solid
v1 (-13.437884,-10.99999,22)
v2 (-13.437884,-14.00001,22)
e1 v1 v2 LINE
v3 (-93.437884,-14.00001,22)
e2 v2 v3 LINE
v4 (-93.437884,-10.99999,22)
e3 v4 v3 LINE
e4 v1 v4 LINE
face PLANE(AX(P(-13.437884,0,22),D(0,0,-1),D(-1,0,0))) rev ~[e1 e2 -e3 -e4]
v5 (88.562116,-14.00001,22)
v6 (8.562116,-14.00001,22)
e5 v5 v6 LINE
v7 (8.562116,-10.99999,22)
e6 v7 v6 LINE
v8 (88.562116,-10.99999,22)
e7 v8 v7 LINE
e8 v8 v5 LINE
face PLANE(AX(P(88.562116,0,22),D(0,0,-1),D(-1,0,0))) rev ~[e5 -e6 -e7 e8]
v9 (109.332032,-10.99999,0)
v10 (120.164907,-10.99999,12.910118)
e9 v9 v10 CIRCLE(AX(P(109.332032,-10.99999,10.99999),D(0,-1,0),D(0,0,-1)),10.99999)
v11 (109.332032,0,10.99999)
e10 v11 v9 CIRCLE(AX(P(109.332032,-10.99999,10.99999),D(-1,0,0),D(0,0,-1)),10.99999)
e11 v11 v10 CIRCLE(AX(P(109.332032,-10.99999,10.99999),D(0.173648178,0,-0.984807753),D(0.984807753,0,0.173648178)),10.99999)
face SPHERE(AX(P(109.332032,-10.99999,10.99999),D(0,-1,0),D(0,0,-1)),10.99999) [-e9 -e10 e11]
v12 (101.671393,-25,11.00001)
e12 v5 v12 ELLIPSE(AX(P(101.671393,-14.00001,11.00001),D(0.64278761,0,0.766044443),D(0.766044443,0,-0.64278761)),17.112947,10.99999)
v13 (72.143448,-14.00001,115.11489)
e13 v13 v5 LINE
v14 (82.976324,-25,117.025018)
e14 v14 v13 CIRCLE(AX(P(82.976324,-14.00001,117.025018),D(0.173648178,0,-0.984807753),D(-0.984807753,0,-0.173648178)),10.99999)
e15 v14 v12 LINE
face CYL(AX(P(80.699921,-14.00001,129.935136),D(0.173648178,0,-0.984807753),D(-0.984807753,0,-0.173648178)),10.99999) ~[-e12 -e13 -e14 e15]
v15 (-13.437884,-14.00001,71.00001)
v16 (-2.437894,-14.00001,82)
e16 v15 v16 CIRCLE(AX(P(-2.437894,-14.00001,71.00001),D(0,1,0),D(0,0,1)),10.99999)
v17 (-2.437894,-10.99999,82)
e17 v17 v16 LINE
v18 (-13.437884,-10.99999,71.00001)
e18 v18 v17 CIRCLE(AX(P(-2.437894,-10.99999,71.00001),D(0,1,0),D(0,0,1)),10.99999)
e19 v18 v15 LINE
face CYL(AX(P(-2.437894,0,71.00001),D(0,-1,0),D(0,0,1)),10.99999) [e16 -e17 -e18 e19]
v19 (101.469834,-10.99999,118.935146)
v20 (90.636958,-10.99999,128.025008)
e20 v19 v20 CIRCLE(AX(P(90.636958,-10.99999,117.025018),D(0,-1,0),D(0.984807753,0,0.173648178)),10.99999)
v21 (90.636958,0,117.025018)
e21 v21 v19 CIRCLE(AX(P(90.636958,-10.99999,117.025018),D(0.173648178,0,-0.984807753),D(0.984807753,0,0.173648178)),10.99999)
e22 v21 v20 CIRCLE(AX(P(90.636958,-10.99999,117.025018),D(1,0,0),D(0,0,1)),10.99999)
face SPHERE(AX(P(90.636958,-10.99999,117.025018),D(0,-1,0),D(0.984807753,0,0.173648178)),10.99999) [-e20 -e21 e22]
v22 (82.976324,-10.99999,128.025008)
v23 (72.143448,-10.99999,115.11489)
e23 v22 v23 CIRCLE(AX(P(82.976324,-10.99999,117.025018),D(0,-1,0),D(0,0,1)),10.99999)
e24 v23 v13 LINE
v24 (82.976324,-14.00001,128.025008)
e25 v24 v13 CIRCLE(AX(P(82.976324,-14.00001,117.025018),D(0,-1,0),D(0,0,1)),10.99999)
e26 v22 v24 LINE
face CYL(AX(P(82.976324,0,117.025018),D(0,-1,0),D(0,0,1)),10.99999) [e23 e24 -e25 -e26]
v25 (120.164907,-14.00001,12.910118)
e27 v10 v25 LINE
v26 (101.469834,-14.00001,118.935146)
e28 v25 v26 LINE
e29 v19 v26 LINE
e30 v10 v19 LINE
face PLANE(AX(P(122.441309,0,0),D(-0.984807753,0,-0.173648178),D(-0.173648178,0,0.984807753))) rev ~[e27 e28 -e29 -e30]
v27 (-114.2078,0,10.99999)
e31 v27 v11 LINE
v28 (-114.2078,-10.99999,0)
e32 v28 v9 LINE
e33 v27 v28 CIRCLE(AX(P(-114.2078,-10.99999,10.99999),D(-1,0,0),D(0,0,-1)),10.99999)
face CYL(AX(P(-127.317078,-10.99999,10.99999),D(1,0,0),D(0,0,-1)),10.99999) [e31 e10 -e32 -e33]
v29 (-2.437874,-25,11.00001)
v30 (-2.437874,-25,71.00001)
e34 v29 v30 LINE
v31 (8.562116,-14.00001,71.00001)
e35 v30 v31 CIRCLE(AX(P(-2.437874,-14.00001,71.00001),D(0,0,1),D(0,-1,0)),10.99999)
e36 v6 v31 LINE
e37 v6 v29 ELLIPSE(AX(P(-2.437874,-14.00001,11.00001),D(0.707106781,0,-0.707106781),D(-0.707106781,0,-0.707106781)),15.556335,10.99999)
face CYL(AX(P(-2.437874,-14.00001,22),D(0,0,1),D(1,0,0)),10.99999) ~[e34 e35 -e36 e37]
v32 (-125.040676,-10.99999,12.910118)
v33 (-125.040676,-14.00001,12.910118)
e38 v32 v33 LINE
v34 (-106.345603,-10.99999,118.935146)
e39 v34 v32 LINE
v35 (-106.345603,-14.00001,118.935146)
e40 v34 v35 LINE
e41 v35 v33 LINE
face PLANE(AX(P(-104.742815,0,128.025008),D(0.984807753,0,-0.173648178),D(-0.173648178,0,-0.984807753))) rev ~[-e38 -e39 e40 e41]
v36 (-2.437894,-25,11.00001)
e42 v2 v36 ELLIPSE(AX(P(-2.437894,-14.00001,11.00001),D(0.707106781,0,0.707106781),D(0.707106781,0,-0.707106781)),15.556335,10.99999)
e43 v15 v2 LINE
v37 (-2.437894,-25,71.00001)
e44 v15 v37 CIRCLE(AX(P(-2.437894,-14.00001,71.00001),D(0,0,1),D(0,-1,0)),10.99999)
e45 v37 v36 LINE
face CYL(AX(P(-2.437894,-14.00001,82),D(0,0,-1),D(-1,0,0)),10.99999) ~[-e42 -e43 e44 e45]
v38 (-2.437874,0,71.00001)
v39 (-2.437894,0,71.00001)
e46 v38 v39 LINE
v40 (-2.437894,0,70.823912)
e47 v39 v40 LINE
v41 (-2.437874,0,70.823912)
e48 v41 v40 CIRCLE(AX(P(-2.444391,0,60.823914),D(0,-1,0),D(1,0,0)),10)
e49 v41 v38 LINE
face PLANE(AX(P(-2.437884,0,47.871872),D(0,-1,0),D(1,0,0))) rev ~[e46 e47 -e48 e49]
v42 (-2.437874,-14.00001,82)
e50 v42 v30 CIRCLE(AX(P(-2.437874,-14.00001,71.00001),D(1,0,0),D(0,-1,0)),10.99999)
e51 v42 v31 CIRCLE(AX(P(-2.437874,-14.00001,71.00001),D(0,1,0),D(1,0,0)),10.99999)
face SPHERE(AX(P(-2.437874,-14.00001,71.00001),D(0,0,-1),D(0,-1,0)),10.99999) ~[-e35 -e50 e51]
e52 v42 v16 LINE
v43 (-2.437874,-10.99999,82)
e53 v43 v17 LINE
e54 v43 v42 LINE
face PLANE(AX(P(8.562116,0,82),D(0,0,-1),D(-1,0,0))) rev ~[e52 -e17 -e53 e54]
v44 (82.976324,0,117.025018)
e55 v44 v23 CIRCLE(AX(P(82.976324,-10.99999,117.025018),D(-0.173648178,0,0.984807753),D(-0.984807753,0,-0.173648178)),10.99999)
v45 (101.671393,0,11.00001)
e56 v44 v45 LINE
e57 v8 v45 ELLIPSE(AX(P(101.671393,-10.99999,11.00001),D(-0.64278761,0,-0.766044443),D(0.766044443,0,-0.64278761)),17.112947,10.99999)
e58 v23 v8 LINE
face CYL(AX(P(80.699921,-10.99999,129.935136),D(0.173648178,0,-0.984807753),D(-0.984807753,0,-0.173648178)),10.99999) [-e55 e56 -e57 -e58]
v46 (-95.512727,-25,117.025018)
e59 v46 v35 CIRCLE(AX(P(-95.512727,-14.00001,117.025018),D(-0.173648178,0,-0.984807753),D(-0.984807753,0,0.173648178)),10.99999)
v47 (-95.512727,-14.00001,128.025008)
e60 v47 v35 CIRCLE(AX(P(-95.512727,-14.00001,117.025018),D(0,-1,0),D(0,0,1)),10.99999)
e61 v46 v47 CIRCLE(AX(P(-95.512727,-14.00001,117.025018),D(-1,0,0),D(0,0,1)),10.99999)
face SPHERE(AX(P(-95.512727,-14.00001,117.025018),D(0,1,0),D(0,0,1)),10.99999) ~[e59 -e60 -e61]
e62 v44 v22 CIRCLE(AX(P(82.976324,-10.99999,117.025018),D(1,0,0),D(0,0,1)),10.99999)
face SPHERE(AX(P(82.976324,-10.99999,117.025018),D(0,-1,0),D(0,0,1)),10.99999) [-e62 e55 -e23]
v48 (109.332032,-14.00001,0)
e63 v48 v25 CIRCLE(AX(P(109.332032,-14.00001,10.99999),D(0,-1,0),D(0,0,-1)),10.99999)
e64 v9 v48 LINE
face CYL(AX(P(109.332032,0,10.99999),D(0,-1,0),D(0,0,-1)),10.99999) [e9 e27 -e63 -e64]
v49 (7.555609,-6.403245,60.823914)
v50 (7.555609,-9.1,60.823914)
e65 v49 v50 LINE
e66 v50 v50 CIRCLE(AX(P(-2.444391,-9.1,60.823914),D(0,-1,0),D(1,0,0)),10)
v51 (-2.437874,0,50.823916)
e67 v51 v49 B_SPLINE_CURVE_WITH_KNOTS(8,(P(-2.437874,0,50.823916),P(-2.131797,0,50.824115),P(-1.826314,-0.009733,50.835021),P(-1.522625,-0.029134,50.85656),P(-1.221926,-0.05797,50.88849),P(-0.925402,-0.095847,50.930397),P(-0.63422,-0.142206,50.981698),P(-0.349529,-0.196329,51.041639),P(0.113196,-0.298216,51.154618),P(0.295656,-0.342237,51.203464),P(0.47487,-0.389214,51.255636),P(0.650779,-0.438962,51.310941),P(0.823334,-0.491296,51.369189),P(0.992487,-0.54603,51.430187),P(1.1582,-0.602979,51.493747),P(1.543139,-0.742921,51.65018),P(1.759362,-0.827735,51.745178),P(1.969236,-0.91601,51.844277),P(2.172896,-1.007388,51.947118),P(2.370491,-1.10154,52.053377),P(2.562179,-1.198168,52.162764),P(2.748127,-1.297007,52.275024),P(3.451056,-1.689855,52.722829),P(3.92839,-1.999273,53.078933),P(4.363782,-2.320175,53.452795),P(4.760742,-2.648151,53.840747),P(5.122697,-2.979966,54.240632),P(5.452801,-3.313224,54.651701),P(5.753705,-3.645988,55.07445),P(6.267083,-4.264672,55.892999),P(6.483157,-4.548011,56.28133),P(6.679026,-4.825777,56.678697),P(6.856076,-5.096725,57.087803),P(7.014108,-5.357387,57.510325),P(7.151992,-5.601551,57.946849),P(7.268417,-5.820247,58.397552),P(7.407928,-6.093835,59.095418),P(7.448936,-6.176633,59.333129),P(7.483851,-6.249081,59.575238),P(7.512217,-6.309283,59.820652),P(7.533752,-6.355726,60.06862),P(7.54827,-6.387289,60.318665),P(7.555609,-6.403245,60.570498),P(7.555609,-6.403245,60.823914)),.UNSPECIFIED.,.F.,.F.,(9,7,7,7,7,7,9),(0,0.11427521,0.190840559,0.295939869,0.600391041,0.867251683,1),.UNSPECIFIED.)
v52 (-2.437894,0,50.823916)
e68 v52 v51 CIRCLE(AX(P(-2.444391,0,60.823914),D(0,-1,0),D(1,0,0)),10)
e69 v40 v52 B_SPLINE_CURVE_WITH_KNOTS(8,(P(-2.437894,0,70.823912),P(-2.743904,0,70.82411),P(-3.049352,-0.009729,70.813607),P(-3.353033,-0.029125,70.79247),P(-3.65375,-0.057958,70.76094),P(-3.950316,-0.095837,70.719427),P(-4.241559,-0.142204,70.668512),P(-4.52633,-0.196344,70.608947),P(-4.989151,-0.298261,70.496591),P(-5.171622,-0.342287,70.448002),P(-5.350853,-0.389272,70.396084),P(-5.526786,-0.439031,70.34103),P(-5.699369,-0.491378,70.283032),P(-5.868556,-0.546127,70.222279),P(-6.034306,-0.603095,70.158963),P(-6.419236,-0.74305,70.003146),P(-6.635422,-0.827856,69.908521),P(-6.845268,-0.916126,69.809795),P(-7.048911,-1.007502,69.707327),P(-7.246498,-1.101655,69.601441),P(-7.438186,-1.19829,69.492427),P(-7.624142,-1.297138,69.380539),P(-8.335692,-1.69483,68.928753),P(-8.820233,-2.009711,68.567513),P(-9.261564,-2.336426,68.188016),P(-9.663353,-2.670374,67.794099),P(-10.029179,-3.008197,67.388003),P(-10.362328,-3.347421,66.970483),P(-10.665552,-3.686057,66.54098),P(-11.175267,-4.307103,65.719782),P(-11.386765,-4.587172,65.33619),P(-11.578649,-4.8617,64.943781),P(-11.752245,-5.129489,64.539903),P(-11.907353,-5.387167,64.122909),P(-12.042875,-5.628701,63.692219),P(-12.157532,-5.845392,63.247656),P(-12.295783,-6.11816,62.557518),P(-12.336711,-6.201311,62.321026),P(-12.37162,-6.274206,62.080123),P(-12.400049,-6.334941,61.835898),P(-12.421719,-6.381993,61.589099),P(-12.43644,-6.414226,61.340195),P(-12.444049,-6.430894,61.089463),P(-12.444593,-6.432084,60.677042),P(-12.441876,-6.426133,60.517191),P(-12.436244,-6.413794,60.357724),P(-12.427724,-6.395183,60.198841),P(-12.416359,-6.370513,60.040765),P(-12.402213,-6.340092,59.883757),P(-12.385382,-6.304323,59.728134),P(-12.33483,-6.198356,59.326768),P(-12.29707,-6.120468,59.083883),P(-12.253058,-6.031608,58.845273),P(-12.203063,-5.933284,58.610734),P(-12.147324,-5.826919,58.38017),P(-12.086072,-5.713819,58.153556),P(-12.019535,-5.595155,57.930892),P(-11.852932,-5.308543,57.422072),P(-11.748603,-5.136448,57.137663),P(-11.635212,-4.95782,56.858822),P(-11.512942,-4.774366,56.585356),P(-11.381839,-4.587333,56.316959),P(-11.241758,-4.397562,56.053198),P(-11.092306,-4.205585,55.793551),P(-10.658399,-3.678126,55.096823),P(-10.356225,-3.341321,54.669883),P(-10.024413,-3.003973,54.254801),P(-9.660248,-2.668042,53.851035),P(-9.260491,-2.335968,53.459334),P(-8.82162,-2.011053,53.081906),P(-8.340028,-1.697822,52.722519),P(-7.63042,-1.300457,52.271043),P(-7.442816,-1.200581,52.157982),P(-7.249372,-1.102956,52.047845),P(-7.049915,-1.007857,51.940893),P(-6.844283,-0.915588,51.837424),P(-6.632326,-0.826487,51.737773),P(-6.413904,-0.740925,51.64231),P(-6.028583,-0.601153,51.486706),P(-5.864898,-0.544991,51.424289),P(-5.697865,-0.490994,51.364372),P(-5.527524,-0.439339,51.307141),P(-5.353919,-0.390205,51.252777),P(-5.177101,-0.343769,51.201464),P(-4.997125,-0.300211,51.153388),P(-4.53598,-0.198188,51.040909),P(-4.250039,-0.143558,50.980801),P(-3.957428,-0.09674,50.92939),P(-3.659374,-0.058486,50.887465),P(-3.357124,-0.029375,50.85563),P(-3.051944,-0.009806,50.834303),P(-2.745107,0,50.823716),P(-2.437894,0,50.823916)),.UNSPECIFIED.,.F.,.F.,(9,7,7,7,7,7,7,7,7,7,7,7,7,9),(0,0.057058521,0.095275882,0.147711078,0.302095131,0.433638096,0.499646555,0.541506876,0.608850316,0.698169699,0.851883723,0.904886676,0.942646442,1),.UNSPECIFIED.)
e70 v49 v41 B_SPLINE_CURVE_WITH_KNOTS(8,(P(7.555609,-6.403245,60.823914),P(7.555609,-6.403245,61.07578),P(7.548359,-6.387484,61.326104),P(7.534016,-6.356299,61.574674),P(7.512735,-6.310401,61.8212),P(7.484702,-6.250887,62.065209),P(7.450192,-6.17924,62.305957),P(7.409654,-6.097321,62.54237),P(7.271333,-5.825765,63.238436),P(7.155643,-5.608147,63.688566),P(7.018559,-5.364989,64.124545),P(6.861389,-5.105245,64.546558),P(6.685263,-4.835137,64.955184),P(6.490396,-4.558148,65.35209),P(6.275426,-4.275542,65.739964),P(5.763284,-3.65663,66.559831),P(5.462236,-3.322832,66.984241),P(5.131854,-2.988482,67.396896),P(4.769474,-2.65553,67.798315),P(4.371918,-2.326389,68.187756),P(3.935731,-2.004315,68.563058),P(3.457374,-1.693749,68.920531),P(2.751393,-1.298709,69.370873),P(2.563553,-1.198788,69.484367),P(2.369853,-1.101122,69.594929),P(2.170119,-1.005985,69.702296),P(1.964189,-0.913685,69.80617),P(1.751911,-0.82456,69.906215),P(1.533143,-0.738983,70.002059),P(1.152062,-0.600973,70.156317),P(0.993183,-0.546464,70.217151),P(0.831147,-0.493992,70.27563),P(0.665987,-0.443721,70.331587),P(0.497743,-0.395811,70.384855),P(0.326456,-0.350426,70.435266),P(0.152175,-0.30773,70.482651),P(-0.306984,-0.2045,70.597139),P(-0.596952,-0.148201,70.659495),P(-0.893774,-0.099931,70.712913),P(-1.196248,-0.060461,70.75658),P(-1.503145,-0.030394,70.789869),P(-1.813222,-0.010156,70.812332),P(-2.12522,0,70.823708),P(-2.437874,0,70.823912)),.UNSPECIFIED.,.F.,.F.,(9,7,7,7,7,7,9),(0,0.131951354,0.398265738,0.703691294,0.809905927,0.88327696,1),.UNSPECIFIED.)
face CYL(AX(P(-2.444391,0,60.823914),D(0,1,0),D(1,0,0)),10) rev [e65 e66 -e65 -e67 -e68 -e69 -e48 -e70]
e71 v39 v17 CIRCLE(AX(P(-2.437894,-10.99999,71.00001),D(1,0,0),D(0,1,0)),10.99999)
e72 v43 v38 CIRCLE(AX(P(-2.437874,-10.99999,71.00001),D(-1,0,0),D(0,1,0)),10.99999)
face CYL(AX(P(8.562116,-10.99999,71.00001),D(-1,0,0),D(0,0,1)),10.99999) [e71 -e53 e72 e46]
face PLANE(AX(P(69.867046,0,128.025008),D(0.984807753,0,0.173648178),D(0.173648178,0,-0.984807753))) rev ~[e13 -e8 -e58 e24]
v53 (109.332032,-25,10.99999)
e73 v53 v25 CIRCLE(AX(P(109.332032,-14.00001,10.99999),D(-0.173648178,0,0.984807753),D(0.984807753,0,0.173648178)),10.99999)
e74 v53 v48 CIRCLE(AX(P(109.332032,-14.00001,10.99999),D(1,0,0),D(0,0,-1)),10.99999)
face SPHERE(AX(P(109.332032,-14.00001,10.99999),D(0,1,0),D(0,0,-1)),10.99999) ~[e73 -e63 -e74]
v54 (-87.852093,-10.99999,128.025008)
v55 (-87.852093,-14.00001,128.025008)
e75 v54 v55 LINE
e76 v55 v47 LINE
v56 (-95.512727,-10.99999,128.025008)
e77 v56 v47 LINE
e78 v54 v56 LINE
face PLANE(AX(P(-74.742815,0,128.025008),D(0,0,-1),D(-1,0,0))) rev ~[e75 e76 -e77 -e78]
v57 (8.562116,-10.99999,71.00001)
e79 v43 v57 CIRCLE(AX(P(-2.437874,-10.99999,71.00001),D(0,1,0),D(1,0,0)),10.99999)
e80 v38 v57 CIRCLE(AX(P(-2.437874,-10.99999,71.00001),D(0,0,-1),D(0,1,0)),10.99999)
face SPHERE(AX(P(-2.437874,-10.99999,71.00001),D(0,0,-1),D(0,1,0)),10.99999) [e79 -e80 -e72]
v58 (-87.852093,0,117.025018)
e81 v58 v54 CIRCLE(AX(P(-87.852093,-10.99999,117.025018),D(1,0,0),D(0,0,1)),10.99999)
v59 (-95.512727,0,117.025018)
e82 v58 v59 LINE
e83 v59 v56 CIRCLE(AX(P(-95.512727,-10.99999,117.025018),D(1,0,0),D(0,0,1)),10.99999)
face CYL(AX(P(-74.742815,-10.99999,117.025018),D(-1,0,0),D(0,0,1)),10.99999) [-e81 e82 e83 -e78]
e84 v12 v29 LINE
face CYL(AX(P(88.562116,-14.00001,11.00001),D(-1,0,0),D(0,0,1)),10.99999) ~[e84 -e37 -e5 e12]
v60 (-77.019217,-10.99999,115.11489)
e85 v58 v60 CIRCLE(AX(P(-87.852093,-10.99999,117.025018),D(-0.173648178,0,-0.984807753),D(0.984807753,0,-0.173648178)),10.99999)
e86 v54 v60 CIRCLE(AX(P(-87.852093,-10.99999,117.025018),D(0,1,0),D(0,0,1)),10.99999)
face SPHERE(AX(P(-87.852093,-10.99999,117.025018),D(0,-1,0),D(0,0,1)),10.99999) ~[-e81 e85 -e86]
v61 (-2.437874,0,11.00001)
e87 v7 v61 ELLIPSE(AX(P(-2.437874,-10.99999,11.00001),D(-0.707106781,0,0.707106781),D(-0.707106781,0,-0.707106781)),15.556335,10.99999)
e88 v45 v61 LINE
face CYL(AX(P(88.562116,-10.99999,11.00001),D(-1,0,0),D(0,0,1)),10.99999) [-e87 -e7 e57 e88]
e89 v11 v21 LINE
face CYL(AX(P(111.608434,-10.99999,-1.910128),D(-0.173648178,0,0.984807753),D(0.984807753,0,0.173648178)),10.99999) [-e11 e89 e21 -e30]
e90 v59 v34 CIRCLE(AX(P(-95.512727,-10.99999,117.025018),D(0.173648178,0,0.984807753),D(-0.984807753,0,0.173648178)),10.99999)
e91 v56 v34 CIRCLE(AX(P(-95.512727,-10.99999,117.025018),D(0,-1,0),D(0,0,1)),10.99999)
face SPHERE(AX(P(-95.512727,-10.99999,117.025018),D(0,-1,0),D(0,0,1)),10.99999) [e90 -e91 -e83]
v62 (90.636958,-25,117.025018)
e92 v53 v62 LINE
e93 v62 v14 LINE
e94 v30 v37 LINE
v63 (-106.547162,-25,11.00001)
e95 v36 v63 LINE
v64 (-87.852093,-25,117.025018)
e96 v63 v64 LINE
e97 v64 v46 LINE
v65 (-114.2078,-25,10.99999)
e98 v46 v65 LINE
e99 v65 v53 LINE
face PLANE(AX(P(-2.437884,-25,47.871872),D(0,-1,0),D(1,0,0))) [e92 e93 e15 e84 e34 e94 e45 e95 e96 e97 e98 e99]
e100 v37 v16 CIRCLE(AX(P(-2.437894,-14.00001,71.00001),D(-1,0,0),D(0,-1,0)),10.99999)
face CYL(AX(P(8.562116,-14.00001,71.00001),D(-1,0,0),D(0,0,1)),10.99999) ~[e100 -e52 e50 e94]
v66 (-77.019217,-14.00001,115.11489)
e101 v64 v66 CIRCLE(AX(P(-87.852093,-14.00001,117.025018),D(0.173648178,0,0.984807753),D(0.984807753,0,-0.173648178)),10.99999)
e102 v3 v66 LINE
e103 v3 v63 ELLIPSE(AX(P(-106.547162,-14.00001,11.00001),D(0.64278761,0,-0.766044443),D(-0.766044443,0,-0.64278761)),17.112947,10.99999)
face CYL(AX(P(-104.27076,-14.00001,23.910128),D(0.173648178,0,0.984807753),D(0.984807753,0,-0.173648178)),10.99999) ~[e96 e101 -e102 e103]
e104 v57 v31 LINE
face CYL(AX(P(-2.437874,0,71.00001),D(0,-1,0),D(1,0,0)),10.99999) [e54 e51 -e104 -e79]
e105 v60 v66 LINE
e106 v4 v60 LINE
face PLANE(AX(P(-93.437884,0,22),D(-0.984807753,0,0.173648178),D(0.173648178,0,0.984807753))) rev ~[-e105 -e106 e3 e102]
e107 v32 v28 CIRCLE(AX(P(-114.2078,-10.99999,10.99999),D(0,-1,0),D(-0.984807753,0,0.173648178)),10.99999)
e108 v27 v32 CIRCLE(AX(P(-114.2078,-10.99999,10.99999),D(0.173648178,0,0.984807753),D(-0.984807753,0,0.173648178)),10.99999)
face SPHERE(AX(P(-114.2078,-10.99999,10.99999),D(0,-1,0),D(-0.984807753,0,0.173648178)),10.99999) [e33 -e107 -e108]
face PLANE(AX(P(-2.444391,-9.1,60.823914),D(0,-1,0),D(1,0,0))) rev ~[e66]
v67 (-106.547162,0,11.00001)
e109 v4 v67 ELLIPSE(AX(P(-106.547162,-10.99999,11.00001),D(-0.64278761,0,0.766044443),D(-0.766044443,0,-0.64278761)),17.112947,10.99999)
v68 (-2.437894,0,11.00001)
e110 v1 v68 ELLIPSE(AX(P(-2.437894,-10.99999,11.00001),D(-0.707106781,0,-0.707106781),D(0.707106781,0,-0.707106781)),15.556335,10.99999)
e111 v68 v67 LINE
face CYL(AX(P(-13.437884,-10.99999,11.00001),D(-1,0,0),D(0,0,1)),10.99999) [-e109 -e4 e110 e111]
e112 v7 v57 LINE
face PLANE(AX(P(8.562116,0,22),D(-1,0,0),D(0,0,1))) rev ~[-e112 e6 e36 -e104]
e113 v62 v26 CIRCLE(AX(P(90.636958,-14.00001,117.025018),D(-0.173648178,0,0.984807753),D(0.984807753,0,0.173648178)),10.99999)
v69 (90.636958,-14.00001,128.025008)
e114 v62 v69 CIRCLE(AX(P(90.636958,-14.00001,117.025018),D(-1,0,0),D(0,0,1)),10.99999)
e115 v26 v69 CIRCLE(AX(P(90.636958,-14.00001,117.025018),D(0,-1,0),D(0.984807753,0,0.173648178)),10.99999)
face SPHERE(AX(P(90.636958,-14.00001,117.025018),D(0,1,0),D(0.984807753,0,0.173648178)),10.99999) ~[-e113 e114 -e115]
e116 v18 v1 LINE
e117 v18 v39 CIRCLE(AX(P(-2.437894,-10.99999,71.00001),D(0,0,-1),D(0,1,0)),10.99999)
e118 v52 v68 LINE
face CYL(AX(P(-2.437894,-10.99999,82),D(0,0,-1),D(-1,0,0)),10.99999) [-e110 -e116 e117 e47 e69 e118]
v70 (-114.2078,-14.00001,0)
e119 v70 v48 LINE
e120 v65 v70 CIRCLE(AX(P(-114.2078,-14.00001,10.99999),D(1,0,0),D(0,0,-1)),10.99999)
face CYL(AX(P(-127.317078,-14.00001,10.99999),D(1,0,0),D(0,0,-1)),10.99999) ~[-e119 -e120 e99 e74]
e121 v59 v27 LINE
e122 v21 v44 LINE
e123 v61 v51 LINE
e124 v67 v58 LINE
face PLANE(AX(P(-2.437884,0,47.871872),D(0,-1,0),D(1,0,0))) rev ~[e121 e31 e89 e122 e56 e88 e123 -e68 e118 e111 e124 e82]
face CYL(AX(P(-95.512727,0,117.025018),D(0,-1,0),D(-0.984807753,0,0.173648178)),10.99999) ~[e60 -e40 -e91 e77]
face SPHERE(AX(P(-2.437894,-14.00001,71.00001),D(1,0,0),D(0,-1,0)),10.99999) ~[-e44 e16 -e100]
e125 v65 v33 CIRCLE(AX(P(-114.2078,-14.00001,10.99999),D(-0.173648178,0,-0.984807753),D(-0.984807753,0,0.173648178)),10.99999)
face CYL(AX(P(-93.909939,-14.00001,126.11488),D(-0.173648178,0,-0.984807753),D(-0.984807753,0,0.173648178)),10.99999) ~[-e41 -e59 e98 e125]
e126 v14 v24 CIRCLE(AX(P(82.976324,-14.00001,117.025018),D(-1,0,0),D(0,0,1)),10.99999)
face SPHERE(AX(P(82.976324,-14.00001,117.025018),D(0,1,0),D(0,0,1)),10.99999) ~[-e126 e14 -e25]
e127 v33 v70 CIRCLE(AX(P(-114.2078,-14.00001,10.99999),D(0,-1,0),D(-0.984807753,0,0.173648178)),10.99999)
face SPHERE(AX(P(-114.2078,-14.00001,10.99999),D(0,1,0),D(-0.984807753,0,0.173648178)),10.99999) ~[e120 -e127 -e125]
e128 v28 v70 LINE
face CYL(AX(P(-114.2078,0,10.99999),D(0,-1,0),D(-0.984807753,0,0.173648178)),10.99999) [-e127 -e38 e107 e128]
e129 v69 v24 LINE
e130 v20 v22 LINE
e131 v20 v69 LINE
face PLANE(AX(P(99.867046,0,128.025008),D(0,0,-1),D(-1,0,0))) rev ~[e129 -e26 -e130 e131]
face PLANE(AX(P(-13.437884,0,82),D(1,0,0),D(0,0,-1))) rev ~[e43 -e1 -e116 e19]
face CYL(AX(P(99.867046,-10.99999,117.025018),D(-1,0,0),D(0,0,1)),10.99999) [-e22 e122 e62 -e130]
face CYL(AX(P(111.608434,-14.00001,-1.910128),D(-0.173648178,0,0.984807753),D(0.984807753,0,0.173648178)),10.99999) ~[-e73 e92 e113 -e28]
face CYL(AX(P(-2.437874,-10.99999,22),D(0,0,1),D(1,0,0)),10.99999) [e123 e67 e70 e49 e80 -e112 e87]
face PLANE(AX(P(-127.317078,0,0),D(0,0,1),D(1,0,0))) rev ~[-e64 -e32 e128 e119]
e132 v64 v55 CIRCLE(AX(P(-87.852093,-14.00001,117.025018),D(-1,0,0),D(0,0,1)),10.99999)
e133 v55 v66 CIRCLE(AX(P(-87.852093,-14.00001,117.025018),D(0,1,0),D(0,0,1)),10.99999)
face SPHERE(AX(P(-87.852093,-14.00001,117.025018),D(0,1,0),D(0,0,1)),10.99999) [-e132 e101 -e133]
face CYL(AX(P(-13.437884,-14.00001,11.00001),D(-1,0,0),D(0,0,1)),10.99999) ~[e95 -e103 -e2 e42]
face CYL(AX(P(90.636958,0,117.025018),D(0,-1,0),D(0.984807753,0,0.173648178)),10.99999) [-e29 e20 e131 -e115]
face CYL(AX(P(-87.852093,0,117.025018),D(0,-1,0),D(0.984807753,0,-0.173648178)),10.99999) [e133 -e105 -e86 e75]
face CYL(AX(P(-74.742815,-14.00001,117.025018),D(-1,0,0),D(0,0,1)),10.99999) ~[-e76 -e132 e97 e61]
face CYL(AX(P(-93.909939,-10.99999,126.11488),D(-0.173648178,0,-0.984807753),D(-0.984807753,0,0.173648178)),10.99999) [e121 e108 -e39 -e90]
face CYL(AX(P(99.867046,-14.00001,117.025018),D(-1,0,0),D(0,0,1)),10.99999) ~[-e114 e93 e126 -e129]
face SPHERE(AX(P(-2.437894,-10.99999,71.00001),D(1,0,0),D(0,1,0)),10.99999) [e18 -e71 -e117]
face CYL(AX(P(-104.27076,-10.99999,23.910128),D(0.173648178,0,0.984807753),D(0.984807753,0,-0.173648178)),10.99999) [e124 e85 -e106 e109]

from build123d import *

# Parameters (mm, degrees)
F1_DEPTH = 25
F2_R     = 10.99999
F3_R     = 10
F4_DEPTH = 9.1


# Not quite as in the source:
# - a fillet or chamfer is up to 0.001 mm smaller than in the source, because OpenCascade refuses the exact size


with BuildPart() as f1:
    # F0 (on Front) → F1 (new body)
    with BuildSketch(Plane.XZ):
        Polygon((-104.7428149239, 128.0250078916), (-127.3170780206, 0), (122.4413091306, 0), (99.8670460339, 128.0250078916), (92.5590772594, 128.0250078916), (69.8670460339, 128.0250078916), (88.562115555, 22), (8.562115555, 22), (8.562115555, 82), (-13.437884445, 82), (-13.437884445, 22), (-93.437884445, 22), (-74.7428149239, 128.0250078916), (-93.565618156, 128.0250078916), align=None)
    extrude(amount=F1_DEPTH)

    # F2 (radius 11 in the source; OpenCascade refuses exactly that, so slightly less here)
    f2_edges = [f1.edges().sort_by_distance(p)[0] for p in [
        (-89.742815, -25, 128.025008),
        (-116.029946, -25, 64.012504),
        (-2.437884, -25, 0),
        (111.154178, -25, 64.012504),
        (84.867046, -25, 128.025008),
        (79.214581, -25, 75.012504),
        (48.562116, -25, 22),
        (8.562116, -25, 52),
        (-2.437884, -25, 82),
        (-13.437884, -25, 52),
        (-53.437884, -25, 22),
        (-84.09035, -25, 75.012504),
        (-89.742815, 0, 128.025008),
        (-116.029946, 0, 64.012504),
        (-2.437884, 0, 0),
        (111.154178, 0, 64.012504),
        (84.867046, 0, 128.025008),
        (79.214581, 0, 75.012504),
        (48.562116, 0, 22),
        (8.562116, 0, 52),
        (-2.437884, 0, 82),
        (-13.437884, 0, 52),
        (-53.437884, 0, 22),
        (-84.09035, 0, 75.012504),
        (-74.742815, -12.5, 128.025008),
        (-104.742815, -12.5, 128.025008),
        (8.562116, -12.5, 82),
        (-13.437884, -12.5, 82),
        (99.867046, -12.5, 128.025008),
        (69.867046, -12.5, 128.025008),
        (122.441309, -12.5, 0),
        (-127.317078, -12.5, 0),
    ]]
    fillet(f2_edges, radius=F2_R)

    # F3 (on Front) → F4 (cut)
    with BuildSketch(Plane.XZ):
        with Locations((-2.4443906732, 60.8239136636)):
            Circle(F3_R)
    extrude(amount=F4_DEPTH, mode=Mode.SUBTRACT)


solid = f1.part
